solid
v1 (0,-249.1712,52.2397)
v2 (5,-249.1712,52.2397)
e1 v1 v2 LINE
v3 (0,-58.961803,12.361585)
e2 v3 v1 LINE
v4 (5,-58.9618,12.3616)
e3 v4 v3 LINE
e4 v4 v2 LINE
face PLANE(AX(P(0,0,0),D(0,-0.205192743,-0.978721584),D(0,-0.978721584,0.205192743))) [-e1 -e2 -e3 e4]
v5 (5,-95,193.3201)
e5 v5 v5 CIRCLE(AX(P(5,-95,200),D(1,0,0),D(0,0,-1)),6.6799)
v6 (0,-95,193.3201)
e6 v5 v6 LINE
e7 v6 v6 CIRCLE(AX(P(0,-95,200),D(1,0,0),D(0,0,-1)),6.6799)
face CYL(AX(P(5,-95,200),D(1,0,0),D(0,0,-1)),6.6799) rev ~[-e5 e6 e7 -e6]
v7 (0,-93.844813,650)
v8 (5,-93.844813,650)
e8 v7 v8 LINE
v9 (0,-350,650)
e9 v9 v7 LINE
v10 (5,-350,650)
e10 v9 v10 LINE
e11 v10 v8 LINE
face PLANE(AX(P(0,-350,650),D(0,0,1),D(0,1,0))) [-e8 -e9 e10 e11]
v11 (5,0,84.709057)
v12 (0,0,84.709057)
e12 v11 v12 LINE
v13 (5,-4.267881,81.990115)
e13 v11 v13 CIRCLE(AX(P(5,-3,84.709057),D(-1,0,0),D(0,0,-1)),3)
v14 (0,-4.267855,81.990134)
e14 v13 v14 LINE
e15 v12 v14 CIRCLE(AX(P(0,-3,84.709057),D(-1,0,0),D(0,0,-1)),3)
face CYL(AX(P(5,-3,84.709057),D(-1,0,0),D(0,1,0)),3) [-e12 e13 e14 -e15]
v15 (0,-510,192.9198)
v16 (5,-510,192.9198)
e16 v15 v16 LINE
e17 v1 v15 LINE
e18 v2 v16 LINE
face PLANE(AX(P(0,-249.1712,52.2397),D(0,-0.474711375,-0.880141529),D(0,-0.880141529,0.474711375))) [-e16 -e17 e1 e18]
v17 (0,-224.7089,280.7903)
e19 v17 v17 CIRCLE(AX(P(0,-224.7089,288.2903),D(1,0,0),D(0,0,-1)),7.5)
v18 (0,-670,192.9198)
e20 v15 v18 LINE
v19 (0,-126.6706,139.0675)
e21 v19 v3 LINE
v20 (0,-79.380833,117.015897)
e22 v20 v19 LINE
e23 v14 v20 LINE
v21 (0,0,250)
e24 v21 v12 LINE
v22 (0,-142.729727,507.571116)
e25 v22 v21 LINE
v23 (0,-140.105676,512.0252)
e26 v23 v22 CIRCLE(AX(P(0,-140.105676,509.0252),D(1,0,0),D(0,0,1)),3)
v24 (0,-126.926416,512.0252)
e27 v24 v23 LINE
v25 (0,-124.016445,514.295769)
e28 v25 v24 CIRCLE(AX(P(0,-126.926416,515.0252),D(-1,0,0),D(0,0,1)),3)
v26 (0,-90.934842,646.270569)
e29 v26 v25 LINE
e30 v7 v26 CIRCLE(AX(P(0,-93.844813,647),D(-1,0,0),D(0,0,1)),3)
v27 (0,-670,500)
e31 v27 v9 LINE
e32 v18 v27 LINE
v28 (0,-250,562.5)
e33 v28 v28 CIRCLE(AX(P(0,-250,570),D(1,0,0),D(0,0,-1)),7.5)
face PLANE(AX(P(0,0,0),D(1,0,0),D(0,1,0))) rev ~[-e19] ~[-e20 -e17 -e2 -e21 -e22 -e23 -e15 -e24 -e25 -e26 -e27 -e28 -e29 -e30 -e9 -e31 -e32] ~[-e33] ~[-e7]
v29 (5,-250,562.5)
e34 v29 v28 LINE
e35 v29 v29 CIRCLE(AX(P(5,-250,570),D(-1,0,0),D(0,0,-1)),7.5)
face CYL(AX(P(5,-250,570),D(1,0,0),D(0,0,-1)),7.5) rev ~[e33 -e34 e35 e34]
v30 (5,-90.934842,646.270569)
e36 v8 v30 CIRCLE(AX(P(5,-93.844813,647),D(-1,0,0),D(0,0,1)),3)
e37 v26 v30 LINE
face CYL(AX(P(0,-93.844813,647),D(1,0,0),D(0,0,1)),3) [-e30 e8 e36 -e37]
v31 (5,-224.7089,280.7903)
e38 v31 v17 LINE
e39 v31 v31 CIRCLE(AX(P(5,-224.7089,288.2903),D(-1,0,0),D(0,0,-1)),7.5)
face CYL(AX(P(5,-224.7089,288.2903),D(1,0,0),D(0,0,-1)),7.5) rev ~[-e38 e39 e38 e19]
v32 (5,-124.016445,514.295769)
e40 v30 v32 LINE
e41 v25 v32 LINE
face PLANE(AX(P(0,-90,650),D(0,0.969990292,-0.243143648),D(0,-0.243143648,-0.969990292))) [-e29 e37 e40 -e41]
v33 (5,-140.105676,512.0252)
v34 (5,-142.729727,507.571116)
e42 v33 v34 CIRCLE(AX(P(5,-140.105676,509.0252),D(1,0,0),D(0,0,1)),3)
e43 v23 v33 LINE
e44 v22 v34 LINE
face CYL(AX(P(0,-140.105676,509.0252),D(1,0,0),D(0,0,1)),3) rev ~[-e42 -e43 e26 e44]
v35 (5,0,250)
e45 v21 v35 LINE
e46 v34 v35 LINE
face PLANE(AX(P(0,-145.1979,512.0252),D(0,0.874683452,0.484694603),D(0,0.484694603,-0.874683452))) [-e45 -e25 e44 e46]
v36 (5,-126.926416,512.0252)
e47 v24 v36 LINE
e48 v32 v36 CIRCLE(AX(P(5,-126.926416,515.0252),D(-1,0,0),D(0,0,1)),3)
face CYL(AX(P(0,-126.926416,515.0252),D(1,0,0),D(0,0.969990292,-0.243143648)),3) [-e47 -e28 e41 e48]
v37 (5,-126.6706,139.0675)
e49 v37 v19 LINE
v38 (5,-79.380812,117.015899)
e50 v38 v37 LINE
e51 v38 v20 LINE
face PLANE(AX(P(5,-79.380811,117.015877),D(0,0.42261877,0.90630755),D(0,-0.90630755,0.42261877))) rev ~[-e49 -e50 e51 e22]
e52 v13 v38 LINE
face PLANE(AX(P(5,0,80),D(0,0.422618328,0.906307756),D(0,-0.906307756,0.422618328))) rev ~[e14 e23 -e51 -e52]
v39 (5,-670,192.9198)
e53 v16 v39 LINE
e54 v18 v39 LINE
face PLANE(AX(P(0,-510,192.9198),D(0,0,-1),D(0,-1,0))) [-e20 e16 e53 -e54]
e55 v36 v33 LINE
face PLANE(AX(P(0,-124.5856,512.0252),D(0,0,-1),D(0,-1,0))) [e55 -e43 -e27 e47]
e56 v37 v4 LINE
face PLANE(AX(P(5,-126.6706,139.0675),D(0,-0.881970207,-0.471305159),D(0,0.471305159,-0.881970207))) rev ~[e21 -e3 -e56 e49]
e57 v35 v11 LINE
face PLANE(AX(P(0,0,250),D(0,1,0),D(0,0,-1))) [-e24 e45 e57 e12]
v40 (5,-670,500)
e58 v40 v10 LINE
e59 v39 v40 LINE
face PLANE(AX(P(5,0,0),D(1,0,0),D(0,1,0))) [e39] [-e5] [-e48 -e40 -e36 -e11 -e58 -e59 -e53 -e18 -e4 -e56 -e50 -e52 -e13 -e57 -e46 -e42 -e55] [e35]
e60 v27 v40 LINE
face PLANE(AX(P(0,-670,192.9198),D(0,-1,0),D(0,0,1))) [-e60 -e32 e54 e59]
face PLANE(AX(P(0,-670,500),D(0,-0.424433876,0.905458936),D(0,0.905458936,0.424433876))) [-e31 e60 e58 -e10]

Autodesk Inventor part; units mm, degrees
ref_plane "YZ Plane" through (0, 0, 0) normal (1, 0, 0) x (0, 1, 0)
ref_plane "XZ Plane" through (0, 0, 0) normal (0, 1, 0) x (-1, 0, 0)
ref_plane "XY Plane" through (0, 0, 0) normal (0, 0, 1) x (1, 0, 0)
sketch "スケッチ1" plane through (0, 0, 0) normal (1, 0, 0) x (0, 1, 0)
  line L0 (-670, 192.9198) -> (-670, 500)
  line L1 (-670, 500) -> (-350, 650)
  line L2 (-350, 650) -> (-90, 650)
  line L3 (0, 250) -> (0, 0)
  line L4 (-124.5856, 512.0252) -> (-145.1979, 512.0252)
  line L5 (-145.1979, 512.0252) -> (0, 250)
  line L6 (-90, 650) -> (-124.5856, 512.0252)
  line L7 (-249.1712, 52.2397) -> (-510, 192.9198)
  line L8 (-510, 192.9198) -> (-670, 192.9198)
  line L9 (0, 0) -> (-249.1712, 52.2397)
  dimension "d2" = 150
  dimension "d3" = 320
  dimension "d4" = 250
  dimension "d5" = 670
  dimension "d79" = 260
extrude "押し出し1" add sketch "スケッチ1" along normal blind 5
sketch "スケッチ8" plane through (5, 0, 0) normal (1, 0, 0) x (0, 0, -1)
  circle A0 centre (-570, -250) radius 7.5
  circle A1 centre (-288.2903, -224.7089) radius 7.5
  line L0 (0, 0) -> (-250, 0) projected
  line L1 (-570, -250) -> (-290.3837, -264.6541)
  line L2 (-290.3837, -264.6541) -> (-288.2903, -224.7089)
  line L3 (0, -804) -> (0, 134) projected
  dimension "d65" = 15
  dimension "d66" = 15
  dimension "d77" = 250
  dimension "d88" = 40
  dimension "d89" = 280
  dimension "d90" = 3
  dimension "d91" = 570
extrude "押し出し8" cut sketch "スケッチ8" against normal through all
sketch "スケッチ12" plane through (5, 0, 0) normal (1, 0, 0) x (0, 0, -1)
  circle A0 centre (-200, -95) radius 6.6799
  point P0 (0, 0)
  dimension "d84" = 200
  dimension "d85" = 95
extrude "押し出し11" cut sketch "スケッチ12" against normal through all
sketch "スケッチ13" plane through (5, 0, 0) normal (1, 0, 0) x (0, 0, -1)
  line L0 (0, -804) -> (0, 134) projected
  line L1 (130, 0) -> (-780, 0) projected
  line L2 (-80, 0) -> (-121.7476, -89.528)
  line L3 (-121.7476, -89.528) -> (-1.0516, -5.0157)
  line L4 (-52.2397, -249.1712) -> (0, 0) projected
  dimension "d95" = 80
  dimension "d96" = 115
  dimension "d97" = 30
extrude "押し出し12" cut sketch "スケッチ13" against normal through all
fillet "フィレット2" radius 3 6 edges at (2.5, -89.528, 121.7476) (2.5, -5.0157, 1.0516) (2.5, 0, 80) (2.5, -145.1979, 512.0252) (2.5, -124.5856, 512.0252) (2.5, -90, 650)
sketch "スケッチ14" plane through (5, 0, 0) normal (1, 0, 0) x (0, 0, -1)
  line L0 (-117.0159, -79.3808) -> (-81.9901, -4.2679) projected
  line L1 (-52.2397, -249.1712) -> (-2.608, -12.4393) projected
  line L2 (-7.2648, -9.3663) -> (-112.5762, -83.1061) projected
  line L3 (-81.9901, -4.2679) -> (-139.0675, -126.6706)
  line L4 (-139.0675, -126.6706) -> (-12.3616, -58.9618)
  line L5 (-52.2397, -249.1712) -> (-2.608, -12.4393) projected
  line L6 (-12.3616, -58.9618) -> (-2.608, -12.4393)
  line L7 (-2.608, -12.4393) -> (0, 0)
  line L8 (0, 0) -> (-81.9901, -4.2679)
extrude "押し出し13" cut sketch "スケッチ14" against normal through all
properties part number "end_plate" material "木材 (オーク)"
